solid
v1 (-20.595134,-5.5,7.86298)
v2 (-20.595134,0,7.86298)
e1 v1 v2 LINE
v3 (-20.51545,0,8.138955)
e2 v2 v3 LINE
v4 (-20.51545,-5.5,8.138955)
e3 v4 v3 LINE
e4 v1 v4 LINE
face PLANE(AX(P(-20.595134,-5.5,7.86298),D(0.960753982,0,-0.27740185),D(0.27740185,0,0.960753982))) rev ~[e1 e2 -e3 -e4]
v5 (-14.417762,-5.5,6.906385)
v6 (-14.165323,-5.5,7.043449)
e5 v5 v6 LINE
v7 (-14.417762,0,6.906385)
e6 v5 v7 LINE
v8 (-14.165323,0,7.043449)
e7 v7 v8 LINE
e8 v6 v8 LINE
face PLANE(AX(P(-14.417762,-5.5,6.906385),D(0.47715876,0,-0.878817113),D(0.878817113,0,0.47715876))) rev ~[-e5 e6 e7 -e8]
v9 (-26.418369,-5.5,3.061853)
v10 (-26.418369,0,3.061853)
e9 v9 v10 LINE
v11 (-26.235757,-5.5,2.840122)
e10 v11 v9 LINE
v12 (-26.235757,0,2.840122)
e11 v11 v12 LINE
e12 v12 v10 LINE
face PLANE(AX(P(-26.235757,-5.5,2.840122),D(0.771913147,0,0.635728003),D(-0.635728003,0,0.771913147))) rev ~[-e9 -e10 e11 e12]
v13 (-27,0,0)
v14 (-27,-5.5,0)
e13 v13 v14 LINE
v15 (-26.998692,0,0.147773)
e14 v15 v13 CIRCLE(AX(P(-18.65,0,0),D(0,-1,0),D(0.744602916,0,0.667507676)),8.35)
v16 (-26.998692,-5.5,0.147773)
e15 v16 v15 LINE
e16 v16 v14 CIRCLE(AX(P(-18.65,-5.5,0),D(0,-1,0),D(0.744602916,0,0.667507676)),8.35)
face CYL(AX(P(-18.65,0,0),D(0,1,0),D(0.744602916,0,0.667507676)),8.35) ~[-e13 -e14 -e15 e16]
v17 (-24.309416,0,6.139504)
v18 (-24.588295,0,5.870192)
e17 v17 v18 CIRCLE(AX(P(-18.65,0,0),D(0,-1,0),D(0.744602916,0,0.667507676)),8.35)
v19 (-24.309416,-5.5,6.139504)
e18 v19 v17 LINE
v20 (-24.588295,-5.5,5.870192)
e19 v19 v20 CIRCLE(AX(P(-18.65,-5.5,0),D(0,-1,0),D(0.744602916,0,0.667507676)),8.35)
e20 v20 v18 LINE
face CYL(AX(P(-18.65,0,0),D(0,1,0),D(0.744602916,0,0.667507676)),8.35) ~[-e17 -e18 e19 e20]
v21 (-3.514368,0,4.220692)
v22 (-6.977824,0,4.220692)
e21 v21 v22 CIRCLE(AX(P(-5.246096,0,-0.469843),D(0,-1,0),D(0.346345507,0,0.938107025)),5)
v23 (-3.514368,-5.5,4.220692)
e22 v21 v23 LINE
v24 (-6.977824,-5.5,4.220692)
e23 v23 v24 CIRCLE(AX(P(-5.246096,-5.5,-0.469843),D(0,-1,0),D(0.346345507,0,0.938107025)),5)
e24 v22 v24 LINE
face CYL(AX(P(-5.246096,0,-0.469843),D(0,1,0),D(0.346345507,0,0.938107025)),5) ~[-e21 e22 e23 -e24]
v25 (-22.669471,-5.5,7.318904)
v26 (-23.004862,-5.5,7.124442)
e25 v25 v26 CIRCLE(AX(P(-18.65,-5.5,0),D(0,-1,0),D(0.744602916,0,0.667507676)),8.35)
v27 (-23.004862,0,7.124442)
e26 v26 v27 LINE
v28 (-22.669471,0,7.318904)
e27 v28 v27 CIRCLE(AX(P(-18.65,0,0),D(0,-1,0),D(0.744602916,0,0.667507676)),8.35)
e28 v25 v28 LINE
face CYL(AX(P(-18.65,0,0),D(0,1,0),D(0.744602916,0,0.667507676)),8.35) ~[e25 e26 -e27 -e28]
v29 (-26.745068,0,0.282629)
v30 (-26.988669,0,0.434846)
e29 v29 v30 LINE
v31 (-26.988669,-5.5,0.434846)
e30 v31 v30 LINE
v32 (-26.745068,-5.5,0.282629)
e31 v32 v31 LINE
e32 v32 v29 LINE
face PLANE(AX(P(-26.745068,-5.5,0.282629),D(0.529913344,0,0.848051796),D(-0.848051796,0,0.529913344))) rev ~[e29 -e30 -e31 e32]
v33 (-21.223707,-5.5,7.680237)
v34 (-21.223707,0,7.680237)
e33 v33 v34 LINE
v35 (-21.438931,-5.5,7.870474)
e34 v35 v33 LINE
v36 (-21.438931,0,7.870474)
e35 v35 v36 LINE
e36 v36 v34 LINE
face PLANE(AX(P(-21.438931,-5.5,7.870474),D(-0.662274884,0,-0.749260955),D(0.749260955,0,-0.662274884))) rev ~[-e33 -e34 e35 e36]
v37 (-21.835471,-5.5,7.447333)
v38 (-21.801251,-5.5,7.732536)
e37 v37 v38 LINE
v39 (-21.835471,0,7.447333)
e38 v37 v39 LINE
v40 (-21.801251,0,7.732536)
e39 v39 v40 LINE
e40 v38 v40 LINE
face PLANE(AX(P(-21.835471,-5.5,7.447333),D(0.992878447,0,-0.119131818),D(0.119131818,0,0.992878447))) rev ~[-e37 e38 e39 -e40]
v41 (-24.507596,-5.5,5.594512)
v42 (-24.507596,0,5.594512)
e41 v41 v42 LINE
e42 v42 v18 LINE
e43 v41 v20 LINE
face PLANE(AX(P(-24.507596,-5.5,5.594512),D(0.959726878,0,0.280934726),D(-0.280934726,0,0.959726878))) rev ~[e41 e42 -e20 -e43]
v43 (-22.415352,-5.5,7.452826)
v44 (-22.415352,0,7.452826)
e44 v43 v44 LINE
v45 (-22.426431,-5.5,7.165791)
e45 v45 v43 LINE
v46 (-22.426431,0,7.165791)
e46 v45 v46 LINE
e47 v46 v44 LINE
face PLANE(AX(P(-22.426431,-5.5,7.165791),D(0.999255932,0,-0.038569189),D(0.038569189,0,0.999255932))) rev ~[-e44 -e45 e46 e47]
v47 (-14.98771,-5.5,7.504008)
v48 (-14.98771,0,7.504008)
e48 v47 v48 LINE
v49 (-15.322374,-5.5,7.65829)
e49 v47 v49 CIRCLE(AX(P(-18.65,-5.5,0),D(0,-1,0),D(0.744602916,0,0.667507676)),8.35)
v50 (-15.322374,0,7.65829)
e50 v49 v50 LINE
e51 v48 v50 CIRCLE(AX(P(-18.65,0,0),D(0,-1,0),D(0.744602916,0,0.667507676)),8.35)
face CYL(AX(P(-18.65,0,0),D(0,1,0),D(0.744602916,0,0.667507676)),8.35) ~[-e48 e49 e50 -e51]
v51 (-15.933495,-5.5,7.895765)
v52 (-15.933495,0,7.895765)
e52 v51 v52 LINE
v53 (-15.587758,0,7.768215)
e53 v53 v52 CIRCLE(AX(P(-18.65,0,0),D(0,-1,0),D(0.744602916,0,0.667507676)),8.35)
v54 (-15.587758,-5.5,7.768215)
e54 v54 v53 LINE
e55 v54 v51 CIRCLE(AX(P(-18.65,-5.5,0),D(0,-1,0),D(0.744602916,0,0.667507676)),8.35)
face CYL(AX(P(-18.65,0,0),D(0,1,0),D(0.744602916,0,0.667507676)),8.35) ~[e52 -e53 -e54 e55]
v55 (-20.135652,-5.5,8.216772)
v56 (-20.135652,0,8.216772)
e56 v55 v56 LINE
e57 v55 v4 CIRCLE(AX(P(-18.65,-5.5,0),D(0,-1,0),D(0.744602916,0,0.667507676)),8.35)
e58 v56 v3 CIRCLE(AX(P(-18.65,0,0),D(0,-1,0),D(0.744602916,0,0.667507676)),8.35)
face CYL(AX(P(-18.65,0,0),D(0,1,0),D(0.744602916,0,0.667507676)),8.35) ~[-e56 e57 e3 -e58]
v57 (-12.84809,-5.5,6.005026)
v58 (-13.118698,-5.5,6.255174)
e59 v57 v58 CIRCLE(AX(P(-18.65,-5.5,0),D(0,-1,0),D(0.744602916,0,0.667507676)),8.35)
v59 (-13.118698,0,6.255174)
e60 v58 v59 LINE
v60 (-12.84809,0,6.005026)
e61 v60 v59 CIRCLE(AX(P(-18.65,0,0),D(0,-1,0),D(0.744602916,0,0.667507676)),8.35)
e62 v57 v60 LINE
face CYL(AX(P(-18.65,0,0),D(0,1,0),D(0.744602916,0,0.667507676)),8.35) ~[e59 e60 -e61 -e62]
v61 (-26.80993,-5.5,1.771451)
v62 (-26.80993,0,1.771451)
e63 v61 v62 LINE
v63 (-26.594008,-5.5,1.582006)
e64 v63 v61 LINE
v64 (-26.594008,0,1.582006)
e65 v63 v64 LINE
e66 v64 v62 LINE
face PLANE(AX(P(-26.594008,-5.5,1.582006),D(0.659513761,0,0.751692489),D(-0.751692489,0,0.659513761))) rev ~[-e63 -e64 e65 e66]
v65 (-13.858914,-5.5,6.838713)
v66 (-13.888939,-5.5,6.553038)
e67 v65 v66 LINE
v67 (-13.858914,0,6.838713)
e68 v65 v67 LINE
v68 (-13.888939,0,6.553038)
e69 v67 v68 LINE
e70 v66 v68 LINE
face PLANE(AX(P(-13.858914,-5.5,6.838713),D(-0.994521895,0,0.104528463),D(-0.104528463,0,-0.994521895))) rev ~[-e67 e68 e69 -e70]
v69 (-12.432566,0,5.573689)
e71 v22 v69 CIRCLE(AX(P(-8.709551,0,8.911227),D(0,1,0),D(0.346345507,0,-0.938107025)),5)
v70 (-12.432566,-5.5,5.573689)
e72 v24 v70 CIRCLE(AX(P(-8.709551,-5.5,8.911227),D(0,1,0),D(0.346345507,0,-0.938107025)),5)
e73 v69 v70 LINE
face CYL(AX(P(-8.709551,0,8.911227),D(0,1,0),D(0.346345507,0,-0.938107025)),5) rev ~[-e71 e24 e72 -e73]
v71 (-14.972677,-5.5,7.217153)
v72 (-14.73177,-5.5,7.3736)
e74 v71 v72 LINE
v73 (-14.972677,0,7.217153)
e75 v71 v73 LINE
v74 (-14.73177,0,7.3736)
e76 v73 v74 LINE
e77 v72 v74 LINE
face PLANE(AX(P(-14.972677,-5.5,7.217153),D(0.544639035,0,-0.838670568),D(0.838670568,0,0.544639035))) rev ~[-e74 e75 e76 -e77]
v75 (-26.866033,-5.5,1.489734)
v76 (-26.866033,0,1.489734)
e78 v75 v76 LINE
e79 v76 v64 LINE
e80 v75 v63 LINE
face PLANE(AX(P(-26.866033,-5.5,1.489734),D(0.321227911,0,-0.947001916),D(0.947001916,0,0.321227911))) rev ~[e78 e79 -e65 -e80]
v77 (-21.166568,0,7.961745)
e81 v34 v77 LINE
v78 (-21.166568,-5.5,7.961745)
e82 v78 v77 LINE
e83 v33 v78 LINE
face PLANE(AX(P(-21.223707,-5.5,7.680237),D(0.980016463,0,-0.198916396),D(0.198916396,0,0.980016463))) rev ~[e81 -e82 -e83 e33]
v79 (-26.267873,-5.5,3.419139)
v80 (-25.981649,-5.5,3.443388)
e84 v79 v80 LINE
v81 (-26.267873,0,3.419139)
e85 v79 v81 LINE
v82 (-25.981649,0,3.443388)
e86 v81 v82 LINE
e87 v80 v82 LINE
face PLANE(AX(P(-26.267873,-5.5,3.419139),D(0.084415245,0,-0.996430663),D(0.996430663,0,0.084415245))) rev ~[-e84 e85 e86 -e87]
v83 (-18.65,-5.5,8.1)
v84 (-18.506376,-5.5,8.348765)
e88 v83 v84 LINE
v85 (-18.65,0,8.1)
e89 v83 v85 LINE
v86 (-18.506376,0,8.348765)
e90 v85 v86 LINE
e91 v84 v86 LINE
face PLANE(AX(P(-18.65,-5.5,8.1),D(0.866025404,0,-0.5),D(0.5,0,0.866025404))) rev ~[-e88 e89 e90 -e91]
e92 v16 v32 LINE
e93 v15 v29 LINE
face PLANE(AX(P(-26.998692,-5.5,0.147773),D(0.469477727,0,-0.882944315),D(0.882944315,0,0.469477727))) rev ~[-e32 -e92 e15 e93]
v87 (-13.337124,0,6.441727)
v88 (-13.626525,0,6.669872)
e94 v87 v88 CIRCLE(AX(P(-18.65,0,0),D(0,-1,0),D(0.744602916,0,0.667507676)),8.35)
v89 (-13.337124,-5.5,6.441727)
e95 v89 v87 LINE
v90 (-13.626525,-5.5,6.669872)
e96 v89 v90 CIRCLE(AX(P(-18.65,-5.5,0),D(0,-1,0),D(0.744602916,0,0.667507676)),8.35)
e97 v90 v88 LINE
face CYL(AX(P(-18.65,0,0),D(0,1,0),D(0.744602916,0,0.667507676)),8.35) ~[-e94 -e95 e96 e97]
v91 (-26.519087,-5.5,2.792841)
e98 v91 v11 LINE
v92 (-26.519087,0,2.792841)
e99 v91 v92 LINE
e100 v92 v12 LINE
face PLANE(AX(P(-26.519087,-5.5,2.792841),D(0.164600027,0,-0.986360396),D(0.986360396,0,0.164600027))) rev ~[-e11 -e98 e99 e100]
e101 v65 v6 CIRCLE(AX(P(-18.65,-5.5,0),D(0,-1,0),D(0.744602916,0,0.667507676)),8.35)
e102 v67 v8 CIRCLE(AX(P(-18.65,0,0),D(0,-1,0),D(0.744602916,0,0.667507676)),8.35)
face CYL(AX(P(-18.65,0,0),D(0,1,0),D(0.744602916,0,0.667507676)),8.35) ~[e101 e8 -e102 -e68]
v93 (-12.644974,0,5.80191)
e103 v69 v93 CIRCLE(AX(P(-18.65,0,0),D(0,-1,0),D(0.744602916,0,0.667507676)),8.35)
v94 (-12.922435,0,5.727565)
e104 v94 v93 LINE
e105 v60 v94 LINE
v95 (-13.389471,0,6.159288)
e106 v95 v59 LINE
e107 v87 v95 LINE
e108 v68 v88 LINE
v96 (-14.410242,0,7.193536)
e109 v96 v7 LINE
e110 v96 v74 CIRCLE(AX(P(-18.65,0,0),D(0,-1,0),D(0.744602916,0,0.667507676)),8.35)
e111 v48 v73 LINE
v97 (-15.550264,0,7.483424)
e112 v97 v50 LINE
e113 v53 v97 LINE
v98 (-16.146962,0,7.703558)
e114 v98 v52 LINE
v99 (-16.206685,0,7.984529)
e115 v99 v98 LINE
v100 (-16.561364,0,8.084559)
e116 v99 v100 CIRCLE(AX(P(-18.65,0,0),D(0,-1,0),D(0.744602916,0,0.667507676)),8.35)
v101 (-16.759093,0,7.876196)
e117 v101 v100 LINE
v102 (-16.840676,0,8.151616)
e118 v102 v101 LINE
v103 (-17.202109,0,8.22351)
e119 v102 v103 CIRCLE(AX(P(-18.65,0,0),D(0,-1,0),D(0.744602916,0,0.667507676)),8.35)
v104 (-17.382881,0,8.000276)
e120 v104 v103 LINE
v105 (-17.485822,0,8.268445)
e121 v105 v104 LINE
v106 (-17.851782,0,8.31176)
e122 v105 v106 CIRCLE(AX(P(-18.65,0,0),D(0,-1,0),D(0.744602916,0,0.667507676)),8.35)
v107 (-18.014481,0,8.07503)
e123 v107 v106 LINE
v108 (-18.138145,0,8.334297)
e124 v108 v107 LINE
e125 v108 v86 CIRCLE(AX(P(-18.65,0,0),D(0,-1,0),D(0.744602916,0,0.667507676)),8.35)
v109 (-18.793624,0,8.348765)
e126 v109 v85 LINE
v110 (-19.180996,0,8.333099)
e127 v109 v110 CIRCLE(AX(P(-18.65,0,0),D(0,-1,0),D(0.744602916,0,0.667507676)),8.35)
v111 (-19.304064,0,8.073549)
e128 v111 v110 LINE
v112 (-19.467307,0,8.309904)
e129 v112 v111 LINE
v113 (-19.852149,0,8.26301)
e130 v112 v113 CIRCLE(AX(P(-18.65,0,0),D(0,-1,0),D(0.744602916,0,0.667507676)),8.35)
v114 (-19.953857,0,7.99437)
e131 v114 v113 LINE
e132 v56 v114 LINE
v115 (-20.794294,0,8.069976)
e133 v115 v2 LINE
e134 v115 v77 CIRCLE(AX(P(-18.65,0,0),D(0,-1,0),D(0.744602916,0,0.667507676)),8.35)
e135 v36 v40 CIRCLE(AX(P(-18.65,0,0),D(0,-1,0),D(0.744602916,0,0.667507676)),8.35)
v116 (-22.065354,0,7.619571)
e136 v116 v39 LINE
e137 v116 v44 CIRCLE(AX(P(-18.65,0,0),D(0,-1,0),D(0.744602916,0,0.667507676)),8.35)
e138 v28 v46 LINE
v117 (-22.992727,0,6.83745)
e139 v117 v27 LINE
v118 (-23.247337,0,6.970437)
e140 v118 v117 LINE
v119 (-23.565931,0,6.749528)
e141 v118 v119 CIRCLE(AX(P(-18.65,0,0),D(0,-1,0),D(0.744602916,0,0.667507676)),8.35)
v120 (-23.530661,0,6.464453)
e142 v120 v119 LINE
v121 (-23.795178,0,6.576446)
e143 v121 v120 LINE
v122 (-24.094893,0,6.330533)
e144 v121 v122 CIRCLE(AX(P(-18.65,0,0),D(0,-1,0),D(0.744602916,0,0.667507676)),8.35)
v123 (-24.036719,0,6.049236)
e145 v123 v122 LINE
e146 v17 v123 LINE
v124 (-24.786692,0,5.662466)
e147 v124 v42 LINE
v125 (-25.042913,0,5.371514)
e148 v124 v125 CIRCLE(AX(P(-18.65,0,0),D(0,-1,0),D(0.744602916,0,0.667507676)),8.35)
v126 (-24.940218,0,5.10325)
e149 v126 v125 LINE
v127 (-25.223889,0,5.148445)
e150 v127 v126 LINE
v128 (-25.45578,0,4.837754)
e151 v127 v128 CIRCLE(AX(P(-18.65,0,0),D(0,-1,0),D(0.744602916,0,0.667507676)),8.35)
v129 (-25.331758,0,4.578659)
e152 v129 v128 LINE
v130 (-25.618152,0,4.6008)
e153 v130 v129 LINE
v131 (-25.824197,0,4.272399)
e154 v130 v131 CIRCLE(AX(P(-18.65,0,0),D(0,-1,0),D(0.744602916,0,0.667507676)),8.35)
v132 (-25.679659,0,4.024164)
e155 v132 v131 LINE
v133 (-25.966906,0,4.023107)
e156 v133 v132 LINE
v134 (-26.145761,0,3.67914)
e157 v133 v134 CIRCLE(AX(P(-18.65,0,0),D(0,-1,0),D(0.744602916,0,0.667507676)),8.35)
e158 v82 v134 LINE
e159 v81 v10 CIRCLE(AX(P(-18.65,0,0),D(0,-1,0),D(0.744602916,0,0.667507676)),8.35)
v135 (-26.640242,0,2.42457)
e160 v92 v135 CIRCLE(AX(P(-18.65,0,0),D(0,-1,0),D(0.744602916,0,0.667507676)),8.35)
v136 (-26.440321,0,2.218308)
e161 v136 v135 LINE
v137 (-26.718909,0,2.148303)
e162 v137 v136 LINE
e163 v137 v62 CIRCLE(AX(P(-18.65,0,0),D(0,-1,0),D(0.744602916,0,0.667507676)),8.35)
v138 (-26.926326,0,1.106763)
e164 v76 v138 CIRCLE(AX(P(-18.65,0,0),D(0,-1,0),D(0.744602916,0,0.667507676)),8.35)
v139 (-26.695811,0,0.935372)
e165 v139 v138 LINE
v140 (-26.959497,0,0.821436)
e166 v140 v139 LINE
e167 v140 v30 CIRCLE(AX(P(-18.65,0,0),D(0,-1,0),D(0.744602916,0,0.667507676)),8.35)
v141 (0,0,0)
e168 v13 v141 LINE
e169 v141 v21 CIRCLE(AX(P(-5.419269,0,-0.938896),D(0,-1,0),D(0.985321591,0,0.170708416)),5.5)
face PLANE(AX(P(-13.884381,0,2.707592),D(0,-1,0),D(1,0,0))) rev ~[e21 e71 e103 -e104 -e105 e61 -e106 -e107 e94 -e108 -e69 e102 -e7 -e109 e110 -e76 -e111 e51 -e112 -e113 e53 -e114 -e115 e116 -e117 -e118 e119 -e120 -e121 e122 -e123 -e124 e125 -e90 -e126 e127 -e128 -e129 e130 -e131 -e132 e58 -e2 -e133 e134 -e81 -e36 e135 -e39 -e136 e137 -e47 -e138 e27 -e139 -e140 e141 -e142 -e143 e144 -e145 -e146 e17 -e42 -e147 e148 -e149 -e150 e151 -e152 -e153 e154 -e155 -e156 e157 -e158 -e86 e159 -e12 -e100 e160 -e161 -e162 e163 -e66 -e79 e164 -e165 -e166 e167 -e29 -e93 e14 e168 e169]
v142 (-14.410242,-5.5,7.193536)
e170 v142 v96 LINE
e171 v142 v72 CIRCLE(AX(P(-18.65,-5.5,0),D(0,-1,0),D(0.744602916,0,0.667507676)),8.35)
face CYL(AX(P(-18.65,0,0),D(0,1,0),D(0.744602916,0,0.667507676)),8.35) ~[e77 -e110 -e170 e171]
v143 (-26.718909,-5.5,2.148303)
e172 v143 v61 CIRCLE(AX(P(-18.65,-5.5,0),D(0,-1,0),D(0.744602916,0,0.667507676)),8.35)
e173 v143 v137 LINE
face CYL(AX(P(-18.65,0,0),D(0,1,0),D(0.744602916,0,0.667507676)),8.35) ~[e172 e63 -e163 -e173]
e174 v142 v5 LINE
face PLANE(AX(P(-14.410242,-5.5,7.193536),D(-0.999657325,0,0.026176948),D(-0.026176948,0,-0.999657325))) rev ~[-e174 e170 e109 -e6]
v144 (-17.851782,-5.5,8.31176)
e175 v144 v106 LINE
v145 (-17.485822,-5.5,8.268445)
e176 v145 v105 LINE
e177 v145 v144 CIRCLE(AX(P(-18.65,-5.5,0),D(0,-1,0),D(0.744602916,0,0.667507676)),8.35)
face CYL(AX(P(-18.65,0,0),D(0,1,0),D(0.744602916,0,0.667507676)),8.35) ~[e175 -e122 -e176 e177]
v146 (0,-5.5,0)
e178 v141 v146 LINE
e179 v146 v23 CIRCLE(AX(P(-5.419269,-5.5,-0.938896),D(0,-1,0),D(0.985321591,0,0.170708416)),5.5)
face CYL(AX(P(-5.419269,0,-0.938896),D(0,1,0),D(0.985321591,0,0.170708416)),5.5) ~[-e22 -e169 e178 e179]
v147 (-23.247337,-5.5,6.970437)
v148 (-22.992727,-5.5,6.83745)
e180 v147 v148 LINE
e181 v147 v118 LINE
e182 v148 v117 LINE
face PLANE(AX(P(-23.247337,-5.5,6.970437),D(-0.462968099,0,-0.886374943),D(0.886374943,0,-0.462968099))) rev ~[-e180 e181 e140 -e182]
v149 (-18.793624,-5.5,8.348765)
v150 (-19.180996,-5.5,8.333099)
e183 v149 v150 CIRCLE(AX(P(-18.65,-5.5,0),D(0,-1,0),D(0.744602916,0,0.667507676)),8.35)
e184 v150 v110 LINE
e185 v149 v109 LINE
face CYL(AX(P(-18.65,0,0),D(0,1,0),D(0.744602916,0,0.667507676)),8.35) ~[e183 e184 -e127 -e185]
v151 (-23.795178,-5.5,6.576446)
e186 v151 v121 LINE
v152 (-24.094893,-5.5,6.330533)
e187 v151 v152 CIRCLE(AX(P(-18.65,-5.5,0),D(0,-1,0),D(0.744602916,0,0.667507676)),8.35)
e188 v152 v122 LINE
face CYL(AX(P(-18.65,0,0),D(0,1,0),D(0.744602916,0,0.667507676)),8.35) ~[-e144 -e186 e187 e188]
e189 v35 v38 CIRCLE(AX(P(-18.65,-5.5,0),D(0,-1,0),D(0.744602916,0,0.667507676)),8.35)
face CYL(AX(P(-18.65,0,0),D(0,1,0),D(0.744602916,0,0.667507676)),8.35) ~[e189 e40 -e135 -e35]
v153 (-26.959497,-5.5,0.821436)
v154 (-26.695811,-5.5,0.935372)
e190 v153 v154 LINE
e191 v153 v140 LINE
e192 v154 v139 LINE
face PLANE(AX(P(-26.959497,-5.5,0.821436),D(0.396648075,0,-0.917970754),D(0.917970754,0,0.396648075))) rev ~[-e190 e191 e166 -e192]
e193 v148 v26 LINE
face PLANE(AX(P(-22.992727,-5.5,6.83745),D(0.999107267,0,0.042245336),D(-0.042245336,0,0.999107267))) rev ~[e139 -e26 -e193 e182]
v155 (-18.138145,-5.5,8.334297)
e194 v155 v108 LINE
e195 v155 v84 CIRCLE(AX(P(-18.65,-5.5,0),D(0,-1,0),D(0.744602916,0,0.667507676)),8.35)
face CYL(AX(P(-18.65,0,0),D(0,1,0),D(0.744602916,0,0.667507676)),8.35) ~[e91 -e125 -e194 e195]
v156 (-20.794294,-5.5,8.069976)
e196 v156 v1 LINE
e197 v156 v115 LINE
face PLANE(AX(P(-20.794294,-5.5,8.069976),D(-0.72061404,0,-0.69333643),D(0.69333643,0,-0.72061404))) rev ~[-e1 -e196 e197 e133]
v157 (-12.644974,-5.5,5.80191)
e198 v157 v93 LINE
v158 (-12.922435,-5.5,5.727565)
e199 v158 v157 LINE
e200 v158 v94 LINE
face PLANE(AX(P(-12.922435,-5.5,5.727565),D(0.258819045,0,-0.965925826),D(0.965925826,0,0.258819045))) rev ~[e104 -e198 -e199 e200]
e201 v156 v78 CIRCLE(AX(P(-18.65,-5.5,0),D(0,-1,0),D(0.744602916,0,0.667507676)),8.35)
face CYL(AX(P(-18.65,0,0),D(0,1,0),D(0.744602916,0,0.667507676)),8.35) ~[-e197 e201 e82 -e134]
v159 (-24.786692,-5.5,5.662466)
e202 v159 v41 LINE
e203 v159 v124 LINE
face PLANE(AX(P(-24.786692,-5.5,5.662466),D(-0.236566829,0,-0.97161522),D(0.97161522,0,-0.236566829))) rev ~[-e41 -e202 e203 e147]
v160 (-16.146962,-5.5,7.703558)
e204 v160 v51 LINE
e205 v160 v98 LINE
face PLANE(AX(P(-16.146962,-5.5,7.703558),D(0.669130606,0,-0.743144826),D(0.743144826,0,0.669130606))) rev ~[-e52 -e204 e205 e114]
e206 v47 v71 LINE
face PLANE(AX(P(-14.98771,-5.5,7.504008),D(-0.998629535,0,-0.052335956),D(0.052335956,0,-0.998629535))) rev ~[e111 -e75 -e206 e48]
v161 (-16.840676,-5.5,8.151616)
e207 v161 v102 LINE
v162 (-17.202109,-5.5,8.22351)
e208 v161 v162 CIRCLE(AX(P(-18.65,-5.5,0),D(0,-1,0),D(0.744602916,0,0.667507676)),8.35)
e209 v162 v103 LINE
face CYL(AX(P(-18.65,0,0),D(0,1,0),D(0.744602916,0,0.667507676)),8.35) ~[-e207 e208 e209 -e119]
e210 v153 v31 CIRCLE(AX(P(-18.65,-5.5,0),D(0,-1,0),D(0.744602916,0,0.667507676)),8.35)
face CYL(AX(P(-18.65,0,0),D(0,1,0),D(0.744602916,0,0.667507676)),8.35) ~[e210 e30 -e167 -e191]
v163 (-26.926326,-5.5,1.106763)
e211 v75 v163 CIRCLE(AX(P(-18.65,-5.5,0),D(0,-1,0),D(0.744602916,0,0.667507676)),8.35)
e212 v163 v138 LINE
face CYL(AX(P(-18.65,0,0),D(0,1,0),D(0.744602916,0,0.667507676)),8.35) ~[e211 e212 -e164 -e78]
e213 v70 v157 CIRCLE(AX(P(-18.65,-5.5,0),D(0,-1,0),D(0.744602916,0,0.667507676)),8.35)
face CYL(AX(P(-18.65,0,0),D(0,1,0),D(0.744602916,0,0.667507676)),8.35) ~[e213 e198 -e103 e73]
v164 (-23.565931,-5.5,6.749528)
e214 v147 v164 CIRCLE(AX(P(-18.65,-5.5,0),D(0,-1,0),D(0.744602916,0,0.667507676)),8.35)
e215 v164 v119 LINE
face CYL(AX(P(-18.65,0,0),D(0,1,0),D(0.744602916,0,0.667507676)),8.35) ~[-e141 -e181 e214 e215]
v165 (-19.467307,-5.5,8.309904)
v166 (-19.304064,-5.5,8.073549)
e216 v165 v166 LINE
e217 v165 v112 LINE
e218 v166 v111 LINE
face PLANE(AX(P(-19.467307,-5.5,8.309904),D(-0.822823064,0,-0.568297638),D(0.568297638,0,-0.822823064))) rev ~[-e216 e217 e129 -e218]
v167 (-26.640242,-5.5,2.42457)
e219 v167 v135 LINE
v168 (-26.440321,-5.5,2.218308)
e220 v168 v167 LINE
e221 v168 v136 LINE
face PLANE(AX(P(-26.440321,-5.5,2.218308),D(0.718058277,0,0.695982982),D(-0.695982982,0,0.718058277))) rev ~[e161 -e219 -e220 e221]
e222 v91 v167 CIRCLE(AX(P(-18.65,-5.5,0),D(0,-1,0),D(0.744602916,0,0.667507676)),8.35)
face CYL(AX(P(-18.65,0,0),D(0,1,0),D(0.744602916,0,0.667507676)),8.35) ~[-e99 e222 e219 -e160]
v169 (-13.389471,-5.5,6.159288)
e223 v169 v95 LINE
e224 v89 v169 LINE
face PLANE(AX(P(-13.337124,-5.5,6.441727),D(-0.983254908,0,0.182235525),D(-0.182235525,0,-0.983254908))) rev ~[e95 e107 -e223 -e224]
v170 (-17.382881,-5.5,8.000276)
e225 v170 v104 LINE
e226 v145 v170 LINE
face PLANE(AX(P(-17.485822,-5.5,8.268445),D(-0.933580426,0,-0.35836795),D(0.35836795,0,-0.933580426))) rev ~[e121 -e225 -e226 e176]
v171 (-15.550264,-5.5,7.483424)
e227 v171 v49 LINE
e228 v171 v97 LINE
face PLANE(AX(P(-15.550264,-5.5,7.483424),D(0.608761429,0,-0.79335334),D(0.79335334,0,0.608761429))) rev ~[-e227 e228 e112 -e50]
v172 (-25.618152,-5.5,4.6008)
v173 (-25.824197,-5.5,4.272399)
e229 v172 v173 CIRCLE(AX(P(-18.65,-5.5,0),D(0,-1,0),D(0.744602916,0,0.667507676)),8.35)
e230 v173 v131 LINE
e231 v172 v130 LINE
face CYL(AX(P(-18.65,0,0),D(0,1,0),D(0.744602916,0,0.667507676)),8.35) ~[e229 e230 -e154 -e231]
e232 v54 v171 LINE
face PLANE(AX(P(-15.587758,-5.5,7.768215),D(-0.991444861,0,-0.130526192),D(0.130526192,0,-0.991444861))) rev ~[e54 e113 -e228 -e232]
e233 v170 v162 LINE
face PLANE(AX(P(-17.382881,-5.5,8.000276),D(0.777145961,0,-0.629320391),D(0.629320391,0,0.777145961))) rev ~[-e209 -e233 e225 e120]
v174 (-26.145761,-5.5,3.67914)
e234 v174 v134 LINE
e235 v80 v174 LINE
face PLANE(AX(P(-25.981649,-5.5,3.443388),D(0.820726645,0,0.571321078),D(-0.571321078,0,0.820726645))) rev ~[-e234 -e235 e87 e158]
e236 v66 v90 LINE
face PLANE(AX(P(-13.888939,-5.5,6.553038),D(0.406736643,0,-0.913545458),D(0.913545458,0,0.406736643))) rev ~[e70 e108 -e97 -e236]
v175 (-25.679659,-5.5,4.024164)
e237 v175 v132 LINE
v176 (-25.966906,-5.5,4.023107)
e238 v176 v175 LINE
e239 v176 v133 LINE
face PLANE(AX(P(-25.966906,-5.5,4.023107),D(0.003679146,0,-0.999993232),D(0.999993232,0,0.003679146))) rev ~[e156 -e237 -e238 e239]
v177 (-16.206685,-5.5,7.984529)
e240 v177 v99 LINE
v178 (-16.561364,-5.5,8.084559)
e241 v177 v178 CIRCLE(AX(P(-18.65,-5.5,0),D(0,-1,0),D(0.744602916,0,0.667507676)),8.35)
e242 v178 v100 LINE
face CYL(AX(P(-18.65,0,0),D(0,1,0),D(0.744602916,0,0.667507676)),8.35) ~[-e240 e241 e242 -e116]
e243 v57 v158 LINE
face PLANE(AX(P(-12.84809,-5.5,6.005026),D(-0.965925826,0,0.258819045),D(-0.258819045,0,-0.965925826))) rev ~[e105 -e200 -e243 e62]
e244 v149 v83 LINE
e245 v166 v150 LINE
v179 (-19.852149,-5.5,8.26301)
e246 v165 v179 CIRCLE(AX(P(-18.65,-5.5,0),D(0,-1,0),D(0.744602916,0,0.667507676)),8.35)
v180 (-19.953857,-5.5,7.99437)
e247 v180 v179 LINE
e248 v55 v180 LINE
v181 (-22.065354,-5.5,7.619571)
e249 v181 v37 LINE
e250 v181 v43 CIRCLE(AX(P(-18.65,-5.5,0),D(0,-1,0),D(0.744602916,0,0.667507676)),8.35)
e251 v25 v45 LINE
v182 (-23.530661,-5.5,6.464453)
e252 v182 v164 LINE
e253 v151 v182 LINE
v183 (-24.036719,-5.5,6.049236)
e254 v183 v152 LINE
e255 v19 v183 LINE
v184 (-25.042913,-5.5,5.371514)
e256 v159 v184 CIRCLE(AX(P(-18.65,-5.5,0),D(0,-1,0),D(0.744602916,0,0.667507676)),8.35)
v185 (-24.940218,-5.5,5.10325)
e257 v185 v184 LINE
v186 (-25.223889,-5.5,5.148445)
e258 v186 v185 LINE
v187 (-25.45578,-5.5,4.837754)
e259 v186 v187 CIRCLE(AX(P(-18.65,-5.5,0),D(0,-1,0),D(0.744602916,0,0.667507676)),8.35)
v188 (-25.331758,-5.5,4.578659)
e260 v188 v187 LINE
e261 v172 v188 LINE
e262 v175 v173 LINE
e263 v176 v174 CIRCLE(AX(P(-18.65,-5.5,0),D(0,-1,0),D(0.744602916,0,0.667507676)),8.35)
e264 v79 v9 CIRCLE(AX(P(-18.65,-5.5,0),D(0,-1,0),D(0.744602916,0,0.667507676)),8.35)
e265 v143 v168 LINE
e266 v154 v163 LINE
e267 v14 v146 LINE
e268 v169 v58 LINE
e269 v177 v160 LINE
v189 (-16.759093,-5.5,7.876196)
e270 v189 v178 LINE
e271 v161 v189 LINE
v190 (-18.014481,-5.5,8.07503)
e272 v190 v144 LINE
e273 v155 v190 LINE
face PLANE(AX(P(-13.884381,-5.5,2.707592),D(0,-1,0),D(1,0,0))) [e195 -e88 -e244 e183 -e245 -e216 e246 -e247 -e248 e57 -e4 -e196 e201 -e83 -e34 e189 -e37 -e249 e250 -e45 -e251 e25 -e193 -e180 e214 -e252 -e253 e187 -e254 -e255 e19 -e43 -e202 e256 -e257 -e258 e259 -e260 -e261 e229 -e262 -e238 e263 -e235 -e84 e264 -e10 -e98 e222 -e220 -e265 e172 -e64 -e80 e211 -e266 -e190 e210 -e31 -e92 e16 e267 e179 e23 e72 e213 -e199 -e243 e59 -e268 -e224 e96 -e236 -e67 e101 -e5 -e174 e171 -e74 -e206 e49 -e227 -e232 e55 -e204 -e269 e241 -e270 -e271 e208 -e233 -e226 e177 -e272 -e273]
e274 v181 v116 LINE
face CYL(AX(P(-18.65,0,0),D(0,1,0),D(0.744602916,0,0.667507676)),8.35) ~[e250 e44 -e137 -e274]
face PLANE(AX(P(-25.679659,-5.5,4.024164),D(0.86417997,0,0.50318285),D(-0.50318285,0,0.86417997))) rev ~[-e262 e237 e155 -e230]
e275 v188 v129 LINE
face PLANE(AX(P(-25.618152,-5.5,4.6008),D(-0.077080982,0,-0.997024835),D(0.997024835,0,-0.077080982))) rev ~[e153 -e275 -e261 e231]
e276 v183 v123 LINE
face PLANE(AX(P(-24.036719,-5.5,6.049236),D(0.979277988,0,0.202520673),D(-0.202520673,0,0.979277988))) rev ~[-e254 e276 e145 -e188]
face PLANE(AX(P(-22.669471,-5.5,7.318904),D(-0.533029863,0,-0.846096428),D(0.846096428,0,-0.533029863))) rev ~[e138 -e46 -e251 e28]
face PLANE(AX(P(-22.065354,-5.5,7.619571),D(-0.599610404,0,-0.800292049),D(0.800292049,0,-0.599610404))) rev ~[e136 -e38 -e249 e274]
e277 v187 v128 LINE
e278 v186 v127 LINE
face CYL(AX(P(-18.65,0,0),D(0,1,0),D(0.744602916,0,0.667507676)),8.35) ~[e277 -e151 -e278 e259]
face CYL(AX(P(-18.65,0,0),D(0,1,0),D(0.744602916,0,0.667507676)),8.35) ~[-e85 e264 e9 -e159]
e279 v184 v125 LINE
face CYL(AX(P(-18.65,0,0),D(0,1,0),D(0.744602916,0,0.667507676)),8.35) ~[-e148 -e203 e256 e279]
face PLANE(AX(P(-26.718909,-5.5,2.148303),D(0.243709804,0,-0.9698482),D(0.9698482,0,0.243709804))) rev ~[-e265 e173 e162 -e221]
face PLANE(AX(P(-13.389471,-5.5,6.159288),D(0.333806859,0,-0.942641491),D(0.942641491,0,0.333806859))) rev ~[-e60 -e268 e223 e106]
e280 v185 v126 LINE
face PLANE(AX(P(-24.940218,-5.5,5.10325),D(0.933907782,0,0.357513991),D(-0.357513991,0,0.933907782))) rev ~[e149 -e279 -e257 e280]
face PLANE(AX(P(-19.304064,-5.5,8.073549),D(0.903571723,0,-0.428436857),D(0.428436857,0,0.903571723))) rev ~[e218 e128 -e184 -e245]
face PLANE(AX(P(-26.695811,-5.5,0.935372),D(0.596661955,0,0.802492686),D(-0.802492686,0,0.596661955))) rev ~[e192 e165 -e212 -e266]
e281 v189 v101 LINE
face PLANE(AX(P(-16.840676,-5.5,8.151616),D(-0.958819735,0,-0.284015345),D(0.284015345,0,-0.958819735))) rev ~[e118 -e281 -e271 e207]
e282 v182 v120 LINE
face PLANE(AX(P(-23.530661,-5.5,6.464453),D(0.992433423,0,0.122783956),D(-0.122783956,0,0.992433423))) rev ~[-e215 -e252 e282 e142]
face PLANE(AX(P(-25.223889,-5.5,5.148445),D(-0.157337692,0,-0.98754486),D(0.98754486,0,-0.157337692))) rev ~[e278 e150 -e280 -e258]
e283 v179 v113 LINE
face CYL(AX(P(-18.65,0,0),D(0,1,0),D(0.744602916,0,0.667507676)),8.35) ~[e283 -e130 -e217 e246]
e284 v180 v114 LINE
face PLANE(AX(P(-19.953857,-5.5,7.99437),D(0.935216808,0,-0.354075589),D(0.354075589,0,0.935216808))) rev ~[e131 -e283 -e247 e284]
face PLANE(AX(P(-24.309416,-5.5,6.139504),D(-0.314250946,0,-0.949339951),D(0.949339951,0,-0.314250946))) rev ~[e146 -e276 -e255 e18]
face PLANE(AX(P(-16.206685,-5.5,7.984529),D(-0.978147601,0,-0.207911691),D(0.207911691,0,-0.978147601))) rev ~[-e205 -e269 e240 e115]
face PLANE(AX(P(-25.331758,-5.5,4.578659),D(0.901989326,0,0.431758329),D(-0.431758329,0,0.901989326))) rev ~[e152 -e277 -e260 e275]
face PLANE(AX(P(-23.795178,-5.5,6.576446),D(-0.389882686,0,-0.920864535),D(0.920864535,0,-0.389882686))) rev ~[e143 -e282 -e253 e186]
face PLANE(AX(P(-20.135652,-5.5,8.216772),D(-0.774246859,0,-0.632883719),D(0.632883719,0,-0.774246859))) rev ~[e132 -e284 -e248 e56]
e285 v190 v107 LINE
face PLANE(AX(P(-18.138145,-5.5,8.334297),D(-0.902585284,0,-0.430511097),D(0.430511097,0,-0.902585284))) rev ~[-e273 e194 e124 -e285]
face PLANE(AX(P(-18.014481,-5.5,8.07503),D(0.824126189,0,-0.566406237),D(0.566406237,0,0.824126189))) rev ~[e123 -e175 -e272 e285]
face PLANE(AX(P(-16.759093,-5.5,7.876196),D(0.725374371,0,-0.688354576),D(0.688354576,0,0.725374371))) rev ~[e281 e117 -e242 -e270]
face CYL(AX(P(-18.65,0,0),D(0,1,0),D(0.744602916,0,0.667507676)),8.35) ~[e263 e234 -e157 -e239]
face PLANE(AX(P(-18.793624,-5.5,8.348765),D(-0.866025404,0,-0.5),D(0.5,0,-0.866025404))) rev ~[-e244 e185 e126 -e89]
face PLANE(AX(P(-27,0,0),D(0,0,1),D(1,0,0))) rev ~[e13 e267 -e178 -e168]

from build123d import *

# Parameters (mm, degrees)
F1_DEPTH         = 5.5
F3_DEPTH         = 5.501
F3_COPIES_COUNT  = 20
F3_COPIES_ANGLE  = 88.0004
F3_COPIES1_COUNT = 11
F3_COPIES1_ANGLE = 45


# Not quite as in the source:
# - a pattern or mirror of a feature is missing from the dataset's text; its kind, count and spacing are read off the source's solid


with BuildPart() as f1:
    # F0 (on Front) → F1 (new body)
    with BuildSketch(Plane.XZ):
        with BuildLine():
            Line((-27, 0), (0, 0))
            ThreePointArc((0, 0), (-1.1926360457, 2.5804184186), (-3.5143684573, 4.2206923475))
            ThreePointArc((-3.5143684573, 4.2206923475), (-5.2460959941, 4.5301572247), (-6.977823531, 4.2206923475))
            ThreePointArc((-6.977823531, 4.2206923475), (-9.9132769797, 4.0582856894), (-12.4325656492, 5.5736890919))
            ThreePointArc((-12.4325656492, 5.5736890919), (-21.6338668847, 7.7986561929), (-27, 0))
        make_face()
    extrude(amount=F1_DEPTH)

    # F2 (on face) → F3 (cut, through all)
    with BuildSketch(Plane.XZ.offset(5.5)):
        with BuildLine():
            ThreePointArc((-18.5063756326, 8.3487647015), (-18.65, 8.35), (-18.7936243674, 8.3487647015))
            Line((-18.7936243674, 8.3487647015), (-18.65, 8.1))
            Line((-18.65, 8.1), (-18.5063756326, 8.3487647015))
        make_face()
    f3 = extrude(amount=-F3_DEPTH, mode=Mode.SUBTRACT)

    # F3_copies: F3 ×20 about axis
    f3_copies_axis = Axis((-18.65, 0, 0), (0, -1, 0))
    for i in range(1, F3_COPIES_COUNT):
        add(f3.rotate(f3_copies_axis, i * F3_COPIES_ANGLE / (F3_COPIES_COUNT - 1)), mode=Mode.SUBTRACT)

    # F3_copies1: F3 ×11 about axis
    f3_copies1_axis = Axis((-18.65, 0, 0), (0, 1, 0))
    for i in range(1, F3_COPIES1_COUNT):
        add(f3.rotate(f3_copies1_axis, i * F3_COPIES1_ANGLE / (F3_COPIES1_COUNT - 1)), mode=Mode.SUBTRACT)


solid = f1.part
